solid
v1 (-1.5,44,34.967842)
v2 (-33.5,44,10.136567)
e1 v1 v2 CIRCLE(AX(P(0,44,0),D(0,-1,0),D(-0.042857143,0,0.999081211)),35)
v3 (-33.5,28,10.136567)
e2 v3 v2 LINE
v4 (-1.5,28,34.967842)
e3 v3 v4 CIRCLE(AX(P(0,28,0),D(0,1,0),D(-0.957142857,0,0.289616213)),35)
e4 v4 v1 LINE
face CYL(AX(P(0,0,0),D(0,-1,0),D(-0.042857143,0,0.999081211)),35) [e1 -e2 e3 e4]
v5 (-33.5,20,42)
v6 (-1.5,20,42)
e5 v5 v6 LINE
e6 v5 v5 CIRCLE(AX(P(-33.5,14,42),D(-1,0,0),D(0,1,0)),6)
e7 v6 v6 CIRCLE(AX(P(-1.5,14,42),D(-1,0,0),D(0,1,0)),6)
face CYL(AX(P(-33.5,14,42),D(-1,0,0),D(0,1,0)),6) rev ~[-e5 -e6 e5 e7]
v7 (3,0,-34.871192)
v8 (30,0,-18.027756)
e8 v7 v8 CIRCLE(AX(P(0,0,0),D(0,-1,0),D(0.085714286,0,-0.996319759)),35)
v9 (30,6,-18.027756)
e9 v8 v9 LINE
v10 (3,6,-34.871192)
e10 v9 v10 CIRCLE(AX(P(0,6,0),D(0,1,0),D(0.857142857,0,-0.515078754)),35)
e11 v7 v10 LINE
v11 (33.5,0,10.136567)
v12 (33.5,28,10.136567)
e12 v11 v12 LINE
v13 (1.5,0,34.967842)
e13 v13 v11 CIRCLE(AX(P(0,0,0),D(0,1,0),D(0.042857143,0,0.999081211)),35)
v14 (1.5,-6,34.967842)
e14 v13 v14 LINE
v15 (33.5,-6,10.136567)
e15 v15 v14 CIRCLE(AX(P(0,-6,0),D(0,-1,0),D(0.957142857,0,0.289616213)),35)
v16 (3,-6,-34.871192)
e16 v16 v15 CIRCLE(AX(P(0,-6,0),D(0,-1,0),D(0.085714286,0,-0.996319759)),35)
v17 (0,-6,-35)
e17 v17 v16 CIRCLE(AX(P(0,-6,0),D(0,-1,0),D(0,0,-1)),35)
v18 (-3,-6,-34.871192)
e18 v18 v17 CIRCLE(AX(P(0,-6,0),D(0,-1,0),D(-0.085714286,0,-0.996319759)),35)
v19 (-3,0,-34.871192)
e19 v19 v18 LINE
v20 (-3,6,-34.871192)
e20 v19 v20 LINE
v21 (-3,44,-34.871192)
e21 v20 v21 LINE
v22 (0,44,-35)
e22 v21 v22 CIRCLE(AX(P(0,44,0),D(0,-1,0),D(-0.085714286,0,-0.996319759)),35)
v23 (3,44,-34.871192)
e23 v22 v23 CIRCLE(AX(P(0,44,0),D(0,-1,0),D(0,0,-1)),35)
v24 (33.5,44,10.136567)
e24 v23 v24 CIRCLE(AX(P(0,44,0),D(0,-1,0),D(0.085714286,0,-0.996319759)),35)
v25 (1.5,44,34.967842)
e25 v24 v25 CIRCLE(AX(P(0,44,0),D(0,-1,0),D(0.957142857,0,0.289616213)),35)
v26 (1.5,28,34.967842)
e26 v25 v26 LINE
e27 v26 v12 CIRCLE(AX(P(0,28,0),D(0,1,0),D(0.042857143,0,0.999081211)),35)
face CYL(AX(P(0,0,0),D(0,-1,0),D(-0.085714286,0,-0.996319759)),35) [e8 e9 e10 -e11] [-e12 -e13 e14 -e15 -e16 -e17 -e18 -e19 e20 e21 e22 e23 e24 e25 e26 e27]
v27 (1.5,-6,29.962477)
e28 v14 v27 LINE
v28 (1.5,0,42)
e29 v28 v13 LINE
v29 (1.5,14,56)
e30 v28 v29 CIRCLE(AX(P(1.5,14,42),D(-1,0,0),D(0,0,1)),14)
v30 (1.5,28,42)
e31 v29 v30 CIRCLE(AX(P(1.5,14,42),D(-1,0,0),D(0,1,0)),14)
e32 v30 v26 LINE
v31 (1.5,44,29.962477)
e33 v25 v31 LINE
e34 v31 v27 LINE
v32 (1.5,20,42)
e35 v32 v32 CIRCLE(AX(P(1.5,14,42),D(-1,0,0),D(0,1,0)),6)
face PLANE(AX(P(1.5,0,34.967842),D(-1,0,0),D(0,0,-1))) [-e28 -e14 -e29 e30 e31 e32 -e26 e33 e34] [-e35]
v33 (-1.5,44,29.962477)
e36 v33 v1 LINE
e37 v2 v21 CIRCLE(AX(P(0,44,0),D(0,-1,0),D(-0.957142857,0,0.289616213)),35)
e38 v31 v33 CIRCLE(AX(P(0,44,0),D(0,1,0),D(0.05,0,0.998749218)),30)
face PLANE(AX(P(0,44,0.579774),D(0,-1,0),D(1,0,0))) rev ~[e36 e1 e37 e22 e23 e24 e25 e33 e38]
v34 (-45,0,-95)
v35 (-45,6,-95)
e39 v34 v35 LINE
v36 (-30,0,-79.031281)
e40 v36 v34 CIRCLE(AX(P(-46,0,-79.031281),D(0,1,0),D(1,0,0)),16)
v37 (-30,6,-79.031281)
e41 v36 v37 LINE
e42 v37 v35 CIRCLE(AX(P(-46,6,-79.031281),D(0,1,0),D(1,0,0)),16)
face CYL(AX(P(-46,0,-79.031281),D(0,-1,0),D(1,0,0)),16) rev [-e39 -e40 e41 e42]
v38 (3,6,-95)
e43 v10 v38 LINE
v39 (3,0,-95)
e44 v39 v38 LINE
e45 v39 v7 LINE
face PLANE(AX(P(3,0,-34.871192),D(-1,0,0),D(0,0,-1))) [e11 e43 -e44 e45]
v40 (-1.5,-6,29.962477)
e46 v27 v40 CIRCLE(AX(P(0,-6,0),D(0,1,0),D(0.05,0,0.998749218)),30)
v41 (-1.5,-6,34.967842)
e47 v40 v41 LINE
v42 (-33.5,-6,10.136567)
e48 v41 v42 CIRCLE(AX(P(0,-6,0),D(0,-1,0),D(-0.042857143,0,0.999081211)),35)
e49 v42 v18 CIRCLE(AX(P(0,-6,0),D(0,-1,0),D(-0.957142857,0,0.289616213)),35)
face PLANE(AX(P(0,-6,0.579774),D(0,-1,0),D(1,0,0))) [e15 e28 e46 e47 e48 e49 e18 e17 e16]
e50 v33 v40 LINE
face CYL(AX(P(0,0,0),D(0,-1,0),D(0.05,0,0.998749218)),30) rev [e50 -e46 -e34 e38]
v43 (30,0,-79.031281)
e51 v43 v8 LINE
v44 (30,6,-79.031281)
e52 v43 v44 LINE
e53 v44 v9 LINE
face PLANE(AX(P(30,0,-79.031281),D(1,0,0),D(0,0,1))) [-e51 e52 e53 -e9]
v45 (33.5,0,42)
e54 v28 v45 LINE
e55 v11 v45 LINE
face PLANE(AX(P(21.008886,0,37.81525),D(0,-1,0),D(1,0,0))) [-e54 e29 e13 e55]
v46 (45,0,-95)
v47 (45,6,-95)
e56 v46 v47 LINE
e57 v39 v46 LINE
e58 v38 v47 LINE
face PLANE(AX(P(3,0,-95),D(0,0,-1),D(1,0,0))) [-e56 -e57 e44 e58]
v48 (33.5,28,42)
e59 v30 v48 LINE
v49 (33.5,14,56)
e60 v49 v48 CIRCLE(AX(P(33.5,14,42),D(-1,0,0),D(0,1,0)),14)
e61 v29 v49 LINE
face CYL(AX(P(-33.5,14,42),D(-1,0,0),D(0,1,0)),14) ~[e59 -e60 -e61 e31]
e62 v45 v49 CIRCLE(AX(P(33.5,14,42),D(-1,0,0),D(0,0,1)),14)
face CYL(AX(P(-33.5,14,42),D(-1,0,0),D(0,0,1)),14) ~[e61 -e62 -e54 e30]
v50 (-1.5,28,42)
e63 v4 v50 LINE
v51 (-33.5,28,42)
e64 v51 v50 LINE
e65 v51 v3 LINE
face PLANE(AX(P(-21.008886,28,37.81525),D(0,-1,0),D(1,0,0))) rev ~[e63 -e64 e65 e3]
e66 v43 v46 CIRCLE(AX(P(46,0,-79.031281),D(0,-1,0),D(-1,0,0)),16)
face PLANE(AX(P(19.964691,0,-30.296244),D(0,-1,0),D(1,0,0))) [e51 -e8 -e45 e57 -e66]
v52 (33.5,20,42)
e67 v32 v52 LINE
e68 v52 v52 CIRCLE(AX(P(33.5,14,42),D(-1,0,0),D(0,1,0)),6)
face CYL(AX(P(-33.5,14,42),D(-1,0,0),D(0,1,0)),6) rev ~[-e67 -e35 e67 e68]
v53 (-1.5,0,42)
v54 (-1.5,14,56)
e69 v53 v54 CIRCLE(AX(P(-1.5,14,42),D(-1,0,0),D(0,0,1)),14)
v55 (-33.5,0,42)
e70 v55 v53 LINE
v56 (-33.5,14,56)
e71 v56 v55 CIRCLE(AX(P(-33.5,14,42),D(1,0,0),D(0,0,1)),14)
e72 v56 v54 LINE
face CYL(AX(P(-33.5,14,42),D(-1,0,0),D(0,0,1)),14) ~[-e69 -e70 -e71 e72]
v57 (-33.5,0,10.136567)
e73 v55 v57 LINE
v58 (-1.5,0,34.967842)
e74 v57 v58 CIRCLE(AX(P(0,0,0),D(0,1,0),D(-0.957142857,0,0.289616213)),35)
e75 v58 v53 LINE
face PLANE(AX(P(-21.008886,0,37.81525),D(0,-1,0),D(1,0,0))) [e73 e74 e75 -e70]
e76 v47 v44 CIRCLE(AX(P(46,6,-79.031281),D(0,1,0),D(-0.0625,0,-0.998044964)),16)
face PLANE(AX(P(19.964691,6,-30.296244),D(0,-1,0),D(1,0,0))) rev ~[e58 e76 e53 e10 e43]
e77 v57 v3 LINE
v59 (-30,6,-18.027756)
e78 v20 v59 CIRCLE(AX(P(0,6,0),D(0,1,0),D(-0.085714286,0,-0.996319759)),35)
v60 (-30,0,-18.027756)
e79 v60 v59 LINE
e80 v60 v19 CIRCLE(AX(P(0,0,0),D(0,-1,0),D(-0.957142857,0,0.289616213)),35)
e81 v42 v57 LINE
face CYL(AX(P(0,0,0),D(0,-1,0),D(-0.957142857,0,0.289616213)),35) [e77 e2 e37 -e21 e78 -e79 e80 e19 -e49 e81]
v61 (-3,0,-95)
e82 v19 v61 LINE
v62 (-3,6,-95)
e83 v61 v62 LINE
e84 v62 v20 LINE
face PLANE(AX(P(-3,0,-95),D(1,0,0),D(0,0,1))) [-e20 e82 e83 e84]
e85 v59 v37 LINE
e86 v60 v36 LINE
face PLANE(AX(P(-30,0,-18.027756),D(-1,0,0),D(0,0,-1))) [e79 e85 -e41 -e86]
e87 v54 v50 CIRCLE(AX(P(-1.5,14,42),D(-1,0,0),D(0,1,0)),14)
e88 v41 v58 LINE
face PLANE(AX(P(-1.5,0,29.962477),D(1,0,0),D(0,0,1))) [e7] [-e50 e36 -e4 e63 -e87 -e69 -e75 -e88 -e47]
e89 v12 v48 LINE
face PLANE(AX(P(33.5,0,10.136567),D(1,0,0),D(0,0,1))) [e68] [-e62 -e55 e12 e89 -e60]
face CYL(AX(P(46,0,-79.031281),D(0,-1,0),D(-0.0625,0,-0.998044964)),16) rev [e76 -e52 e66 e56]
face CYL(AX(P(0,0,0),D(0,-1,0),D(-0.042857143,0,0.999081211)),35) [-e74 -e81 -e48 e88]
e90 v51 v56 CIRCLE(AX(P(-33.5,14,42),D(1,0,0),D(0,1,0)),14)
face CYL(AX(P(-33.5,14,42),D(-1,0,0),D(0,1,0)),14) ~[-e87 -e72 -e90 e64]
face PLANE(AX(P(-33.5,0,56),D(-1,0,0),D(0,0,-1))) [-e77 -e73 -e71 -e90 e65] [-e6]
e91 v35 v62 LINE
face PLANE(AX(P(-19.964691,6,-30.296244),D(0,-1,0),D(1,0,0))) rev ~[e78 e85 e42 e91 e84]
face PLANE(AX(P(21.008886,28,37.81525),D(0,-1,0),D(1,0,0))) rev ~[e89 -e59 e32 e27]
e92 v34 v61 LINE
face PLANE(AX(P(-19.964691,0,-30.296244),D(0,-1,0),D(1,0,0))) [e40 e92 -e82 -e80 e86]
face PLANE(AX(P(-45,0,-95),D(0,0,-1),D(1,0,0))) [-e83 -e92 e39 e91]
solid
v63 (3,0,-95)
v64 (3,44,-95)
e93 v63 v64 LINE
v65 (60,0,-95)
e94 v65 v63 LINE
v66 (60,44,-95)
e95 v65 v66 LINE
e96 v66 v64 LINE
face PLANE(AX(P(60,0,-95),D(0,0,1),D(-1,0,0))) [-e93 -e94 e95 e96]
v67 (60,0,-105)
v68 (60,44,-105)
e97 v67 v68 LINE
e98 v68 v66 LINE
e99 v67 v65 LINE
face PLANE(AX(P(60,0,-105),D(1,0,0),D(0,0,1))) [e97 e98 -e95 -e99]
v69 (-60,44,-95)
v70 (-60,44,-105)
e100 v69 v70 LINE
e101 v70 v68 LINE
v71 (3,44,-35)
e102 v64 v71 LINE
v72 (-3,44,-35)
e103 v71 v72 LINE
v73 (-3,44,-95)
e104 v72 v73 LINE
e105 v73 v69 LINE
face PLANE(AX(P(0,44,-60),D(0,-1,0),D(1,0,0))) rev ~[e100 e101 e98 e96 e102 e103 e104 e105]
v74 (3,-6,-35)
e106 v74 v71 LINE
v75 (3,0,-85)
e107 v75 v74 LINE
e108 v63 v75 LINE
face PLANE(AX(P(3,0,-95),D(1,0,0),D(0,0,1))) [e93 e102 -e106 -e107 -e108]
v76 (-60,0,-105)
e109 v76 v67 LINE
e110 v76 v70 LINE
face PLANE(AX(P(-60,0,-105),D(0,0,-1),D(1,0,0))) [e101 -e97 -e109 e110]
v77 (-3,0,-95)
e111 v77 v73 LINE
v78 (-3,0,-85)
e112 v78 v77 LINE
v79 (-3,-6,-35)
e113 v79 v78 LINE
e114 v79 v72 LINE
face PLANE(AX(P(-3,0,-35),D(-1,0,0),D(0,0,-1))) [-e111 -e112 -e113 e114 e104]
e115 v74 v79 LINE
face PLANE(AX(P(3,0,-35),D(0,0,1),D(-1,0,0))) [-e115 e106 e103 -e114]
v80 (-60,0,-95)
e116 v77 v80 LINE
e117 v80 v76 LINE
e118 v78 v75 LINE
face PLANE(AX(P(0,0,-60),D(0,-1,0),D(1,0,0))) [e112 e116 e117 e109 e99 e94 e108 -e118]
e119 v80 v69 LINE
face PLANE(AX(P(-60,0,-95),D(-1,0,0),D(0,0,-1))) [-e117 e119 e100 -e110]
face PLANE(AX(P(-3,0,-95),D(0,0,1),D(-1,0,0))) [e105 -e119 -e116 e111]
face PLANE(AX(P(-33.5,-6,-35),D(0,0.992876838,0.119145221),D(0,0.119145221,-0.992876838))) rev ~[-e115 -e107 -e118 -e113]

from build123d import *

# Parameters (mm, degrees)
F1_DEPTH = 6
F2_DEPTH = 44
F0_W     = 6
F0_H     = 10
F3_DEPTH = 6
F4_DEPTH = 28
F6_DEPTH = 93.501
F7_DEPTH = 93.501


with BuildPart() as f1:
    # F0 (on Front) → F1 (new body)
    with BuildSketch(Plane.XZ):
        with BuildLine():
            ThreePointArc((-33.5, 10.1365674664), (-34.7328343847, -4.3162733471), (-30, -18.0277563773))
            ThreePointArc((-30, -18.0277563773), (-18.5249919592, -29.695532878), (-3, -34.8711915483))
            ThreePointArc((-3, -34.8711915483), (-1.5013819904, -34.9677830598), (1.54e-08, -35))
            ThreePointArc((1.54e-08, -35), (1.5013820058, -34.9677830592), (3, -34.8711915483))
            ThreePointArc((3, -34.8711915483), (18.5249919592, -29.695532878), (30, -18.0277563773))
            ThreePointArc((30, -18.0277563773), (34.7328343847, -4.3162733471), (33.5, 10.1365674664))
            ThreePointArc((33.5, 10.1365674664), (21.4568882491, 27.6514366113), (1.5, 34.9678423698))
            Line((1.5, 34.9678423698), (1.5, 29.9624765332))
            ThreePointArc((1.5, 29.9624765332), (0, -30), (-1.5, 29.9624765332))
            Line((-1.5, 29.9624765332), (-1.5, 34.9678423698))
            ThreePointArc((-1.5, 34.9678423698), (-21.4568882491, 27.6514366113), (-33.5, 10.1365674664))
        make_face()
    extrude(amount=F1_DEPTH)

    # F0 (on Front) → F2 (join)
    with BuildSketch(Plane.XZ):
        with BuildLine():
            ThreePointArc((-33.5, 10.1365674664), (-34.7328343847, -4.3162733471), (-30, -18.0277563773))
            ThreePointArc((-30, -18.0277563773), (-18.5249919592, -29.695532878), (-3, -34.8711915483))
            ThreePointArc((-3, -34.8711915483), (-1.5013819904, -34.9677830598), (1.54e-08, -35))
            ThreePointArc((1.54e-08, -35), (1.5013820058, -34.9677830592), (3, -34.8711915483))
            ThreePointArc((3, -34.8711915483), (18.5249919592, -29.695532878), (30, -18.0277563773))
            ThreePointArc((30, -18.0277563773), (34.7328343847, -4.3162733471), (33.5, 10.1365674664))
            ThreePointArc((33.5, 10.1365674664), (21.4568882491, 27.6514366113), (1.5, 34.9678423698))
            Line((1.5, 34.9678423698), (1.5, 29.9624765332))
            ThreePointArc((1.5, 29.9624765332), (0, -30), (-1.5, 29.9624765332))
            Line((-1.5, 29.9624765332), (-1.5, 34.9678423698))
            ThreePointArc((-1.5, 34.9678423698), (-21.4568882491, 27.6514366113), (-33.5, 10.1365674664))
        make_face()
    extrude(amount=-F2_DEPTH)

    # F0 (on Front) → F3 (join)
    with BuildSketch(Plane.XZ):
        with BuildLine():
            Line((-30, -18.0277563773), (-30, -35))
            Line((-30, -35), (-3, -35))
            Line((-3, -35), (-3, -34.8711915483))
            ThreePointArc((-3, -34.8711915483), (-18.5249919592, -29.695532878), (-30, -18.0277563773))
        make_face()
        with BuildLine():
            Line((3, -34.8711915483), (3, -35))
            Line((3, -35), (30, -35))
            Line((30, -35), (30, -18.0277563773))
            ThreePointArc((30, -18.0277563773), (18.5249919592, -29.695532878), (3, -34.8711915483))
        make_face()
        with BuildLine():
            Line((-30, -95), (-30, -79.0312805773))
            ThreePointArc((-30, -79.0312805773), (-34.3380962103, -89.9857317274), (-45, -95))
            Line((-45, -95), (-30, -95))
        make_face()
        with BuildLine():
            ThreePointArc((45, -95), (34.3380962103, -89.9857317274), (30, -79.0312805773))
            Line((30, -79.0312805773), (30, -95))
            Line((30, -95), (45, -95))
        make_face()
        Polygon((-3, -35), (-30, -35), (-30, -79.0312805773), (-30, -95), (-3, -95), (-3, -85), align=None)
        Polygon((30, -35), (3, -35), (3, -85), (3, -95), (30, -95), (30, -79.0312805773), align=None)
    extrude(amount=-F3_DEPTH)

    # F0 (on Front) → F4 (join)
    with BuildSketch(Plane.XZ):
        with BuildLine():
            Line((-33.5, 56), (-33.5, 10.1365674664))
            ThreePointArc((-33.5, 10.1365674664), (-21.4568882491, 27.6514366113), (-1.5, 34.9678423698))
            Line((-1.5, 34.9678423698), (-1.5, 56))
            Line((-1.5, 56), (-33.5, 56))
        make_face()
        with BuildLine():
            ThreePointArc((1.5, 34.9678423698), (21.4568882491, 27.6514366113), (33.5, 10.1365674664))
            Line((33.5, 10.1365674664), (33.5, 56))
            Line((33.5, 56), (1.5, 56))
            Line((1.5, 56), (1.5, 34.9678423698))
        make_face()
    extrude(amount=-F4_DEPTH)


with BuildPart() as f1b:
    # F0 (on Front) → F1, piece 2 (new body)
    with BuildSketch(Plane.XZ):
        Polygon((1.54e-08, -35), (-3, -35), (-3, -85), (3, -85), (3, -35), align=None)
    extrude(amount=F1_DEPTH)

    # F0 (on Front) → F2, piece 2 (join)
    with BuildSketch(Plane.XZ):
        Polygon((1.54e-08, -35), (-3, -35), (-3, -85), (3, -85), (3, -35), align=None)
        Polygon((-3, -95), (-30, -95), (-45, -95), (-60, -95), (-60, -105), (60, -105), (60, -95), (45, -95), (30, -95), (3, -95), align=None)
        with Locations((0, -90)):
            Rectangle(F0_W, F0_H)
    extrude(amount=-F2_DEPTH)


with BuildPart() as f6_tool:
    # F5 (on face) → F6 (new body, through all)
    with BuildSketch(Plane(origin=(-33.5, 0, 0), x_dir=(0, -1, 0), z_dir=(-1, 0, 0))):
        with BuildLine():
            ThreePointArc((-28, 42), (-23.8994949366, 51.8994949366), (-14, 56))
            Line((-14, 56), (-28, 56))
            Line((-28, 56), (-28, 42))
        make_face()
        with BuildLine():
            ThreePointArc((-14, 56), (-4.1005050634, 51.8994949366), (0, 42))
            Line((0, 42), (0, 56))
            Line((0, 56), (-14, 56))
        make_face()
        with BuildLine():
            Line((-20, 42), (-8, 42))
            ThreePointArc((-8, 42), (-14, 48), (-20, 42))
        make_face()
        with BuildLine():
            ThreePointArc((-20, 42), (-14, 36), (-8, 42))
            Line((-8, 42), (-20, 42))
        make_face()
        Polygon((0, -85), (6, -85), (6, -35), align=None)
    extrude(amount=-F6_DEPTH)


with BuildPart() as f1_1:
    add(f1.part)

    # F6: cut by f6_tool
    add(f6_tool.part, mode=Mode.SUBTRACT)

    # F5 (on face) → F7 (cut, through all)
    with BuildSketch(Plane(origin=(-33.5, 0, 0), x_dir=(0, -1, 0), z_dir=(-1, 0, 0))):
        Polygon((0, -85), (6, -85), (6, -35), align=None)
    extrude(amount=-F7_DEPTH, mode=Mode.SUBTRACT)


with BuildPart() as f1b_1:
    add(f1b.part)

    # F6: cut by f6_tool
    add(f6_tool.part, mode=Mode.SUBTRACT)


solid = Compound([f1_1.part, f1b_1.part])
